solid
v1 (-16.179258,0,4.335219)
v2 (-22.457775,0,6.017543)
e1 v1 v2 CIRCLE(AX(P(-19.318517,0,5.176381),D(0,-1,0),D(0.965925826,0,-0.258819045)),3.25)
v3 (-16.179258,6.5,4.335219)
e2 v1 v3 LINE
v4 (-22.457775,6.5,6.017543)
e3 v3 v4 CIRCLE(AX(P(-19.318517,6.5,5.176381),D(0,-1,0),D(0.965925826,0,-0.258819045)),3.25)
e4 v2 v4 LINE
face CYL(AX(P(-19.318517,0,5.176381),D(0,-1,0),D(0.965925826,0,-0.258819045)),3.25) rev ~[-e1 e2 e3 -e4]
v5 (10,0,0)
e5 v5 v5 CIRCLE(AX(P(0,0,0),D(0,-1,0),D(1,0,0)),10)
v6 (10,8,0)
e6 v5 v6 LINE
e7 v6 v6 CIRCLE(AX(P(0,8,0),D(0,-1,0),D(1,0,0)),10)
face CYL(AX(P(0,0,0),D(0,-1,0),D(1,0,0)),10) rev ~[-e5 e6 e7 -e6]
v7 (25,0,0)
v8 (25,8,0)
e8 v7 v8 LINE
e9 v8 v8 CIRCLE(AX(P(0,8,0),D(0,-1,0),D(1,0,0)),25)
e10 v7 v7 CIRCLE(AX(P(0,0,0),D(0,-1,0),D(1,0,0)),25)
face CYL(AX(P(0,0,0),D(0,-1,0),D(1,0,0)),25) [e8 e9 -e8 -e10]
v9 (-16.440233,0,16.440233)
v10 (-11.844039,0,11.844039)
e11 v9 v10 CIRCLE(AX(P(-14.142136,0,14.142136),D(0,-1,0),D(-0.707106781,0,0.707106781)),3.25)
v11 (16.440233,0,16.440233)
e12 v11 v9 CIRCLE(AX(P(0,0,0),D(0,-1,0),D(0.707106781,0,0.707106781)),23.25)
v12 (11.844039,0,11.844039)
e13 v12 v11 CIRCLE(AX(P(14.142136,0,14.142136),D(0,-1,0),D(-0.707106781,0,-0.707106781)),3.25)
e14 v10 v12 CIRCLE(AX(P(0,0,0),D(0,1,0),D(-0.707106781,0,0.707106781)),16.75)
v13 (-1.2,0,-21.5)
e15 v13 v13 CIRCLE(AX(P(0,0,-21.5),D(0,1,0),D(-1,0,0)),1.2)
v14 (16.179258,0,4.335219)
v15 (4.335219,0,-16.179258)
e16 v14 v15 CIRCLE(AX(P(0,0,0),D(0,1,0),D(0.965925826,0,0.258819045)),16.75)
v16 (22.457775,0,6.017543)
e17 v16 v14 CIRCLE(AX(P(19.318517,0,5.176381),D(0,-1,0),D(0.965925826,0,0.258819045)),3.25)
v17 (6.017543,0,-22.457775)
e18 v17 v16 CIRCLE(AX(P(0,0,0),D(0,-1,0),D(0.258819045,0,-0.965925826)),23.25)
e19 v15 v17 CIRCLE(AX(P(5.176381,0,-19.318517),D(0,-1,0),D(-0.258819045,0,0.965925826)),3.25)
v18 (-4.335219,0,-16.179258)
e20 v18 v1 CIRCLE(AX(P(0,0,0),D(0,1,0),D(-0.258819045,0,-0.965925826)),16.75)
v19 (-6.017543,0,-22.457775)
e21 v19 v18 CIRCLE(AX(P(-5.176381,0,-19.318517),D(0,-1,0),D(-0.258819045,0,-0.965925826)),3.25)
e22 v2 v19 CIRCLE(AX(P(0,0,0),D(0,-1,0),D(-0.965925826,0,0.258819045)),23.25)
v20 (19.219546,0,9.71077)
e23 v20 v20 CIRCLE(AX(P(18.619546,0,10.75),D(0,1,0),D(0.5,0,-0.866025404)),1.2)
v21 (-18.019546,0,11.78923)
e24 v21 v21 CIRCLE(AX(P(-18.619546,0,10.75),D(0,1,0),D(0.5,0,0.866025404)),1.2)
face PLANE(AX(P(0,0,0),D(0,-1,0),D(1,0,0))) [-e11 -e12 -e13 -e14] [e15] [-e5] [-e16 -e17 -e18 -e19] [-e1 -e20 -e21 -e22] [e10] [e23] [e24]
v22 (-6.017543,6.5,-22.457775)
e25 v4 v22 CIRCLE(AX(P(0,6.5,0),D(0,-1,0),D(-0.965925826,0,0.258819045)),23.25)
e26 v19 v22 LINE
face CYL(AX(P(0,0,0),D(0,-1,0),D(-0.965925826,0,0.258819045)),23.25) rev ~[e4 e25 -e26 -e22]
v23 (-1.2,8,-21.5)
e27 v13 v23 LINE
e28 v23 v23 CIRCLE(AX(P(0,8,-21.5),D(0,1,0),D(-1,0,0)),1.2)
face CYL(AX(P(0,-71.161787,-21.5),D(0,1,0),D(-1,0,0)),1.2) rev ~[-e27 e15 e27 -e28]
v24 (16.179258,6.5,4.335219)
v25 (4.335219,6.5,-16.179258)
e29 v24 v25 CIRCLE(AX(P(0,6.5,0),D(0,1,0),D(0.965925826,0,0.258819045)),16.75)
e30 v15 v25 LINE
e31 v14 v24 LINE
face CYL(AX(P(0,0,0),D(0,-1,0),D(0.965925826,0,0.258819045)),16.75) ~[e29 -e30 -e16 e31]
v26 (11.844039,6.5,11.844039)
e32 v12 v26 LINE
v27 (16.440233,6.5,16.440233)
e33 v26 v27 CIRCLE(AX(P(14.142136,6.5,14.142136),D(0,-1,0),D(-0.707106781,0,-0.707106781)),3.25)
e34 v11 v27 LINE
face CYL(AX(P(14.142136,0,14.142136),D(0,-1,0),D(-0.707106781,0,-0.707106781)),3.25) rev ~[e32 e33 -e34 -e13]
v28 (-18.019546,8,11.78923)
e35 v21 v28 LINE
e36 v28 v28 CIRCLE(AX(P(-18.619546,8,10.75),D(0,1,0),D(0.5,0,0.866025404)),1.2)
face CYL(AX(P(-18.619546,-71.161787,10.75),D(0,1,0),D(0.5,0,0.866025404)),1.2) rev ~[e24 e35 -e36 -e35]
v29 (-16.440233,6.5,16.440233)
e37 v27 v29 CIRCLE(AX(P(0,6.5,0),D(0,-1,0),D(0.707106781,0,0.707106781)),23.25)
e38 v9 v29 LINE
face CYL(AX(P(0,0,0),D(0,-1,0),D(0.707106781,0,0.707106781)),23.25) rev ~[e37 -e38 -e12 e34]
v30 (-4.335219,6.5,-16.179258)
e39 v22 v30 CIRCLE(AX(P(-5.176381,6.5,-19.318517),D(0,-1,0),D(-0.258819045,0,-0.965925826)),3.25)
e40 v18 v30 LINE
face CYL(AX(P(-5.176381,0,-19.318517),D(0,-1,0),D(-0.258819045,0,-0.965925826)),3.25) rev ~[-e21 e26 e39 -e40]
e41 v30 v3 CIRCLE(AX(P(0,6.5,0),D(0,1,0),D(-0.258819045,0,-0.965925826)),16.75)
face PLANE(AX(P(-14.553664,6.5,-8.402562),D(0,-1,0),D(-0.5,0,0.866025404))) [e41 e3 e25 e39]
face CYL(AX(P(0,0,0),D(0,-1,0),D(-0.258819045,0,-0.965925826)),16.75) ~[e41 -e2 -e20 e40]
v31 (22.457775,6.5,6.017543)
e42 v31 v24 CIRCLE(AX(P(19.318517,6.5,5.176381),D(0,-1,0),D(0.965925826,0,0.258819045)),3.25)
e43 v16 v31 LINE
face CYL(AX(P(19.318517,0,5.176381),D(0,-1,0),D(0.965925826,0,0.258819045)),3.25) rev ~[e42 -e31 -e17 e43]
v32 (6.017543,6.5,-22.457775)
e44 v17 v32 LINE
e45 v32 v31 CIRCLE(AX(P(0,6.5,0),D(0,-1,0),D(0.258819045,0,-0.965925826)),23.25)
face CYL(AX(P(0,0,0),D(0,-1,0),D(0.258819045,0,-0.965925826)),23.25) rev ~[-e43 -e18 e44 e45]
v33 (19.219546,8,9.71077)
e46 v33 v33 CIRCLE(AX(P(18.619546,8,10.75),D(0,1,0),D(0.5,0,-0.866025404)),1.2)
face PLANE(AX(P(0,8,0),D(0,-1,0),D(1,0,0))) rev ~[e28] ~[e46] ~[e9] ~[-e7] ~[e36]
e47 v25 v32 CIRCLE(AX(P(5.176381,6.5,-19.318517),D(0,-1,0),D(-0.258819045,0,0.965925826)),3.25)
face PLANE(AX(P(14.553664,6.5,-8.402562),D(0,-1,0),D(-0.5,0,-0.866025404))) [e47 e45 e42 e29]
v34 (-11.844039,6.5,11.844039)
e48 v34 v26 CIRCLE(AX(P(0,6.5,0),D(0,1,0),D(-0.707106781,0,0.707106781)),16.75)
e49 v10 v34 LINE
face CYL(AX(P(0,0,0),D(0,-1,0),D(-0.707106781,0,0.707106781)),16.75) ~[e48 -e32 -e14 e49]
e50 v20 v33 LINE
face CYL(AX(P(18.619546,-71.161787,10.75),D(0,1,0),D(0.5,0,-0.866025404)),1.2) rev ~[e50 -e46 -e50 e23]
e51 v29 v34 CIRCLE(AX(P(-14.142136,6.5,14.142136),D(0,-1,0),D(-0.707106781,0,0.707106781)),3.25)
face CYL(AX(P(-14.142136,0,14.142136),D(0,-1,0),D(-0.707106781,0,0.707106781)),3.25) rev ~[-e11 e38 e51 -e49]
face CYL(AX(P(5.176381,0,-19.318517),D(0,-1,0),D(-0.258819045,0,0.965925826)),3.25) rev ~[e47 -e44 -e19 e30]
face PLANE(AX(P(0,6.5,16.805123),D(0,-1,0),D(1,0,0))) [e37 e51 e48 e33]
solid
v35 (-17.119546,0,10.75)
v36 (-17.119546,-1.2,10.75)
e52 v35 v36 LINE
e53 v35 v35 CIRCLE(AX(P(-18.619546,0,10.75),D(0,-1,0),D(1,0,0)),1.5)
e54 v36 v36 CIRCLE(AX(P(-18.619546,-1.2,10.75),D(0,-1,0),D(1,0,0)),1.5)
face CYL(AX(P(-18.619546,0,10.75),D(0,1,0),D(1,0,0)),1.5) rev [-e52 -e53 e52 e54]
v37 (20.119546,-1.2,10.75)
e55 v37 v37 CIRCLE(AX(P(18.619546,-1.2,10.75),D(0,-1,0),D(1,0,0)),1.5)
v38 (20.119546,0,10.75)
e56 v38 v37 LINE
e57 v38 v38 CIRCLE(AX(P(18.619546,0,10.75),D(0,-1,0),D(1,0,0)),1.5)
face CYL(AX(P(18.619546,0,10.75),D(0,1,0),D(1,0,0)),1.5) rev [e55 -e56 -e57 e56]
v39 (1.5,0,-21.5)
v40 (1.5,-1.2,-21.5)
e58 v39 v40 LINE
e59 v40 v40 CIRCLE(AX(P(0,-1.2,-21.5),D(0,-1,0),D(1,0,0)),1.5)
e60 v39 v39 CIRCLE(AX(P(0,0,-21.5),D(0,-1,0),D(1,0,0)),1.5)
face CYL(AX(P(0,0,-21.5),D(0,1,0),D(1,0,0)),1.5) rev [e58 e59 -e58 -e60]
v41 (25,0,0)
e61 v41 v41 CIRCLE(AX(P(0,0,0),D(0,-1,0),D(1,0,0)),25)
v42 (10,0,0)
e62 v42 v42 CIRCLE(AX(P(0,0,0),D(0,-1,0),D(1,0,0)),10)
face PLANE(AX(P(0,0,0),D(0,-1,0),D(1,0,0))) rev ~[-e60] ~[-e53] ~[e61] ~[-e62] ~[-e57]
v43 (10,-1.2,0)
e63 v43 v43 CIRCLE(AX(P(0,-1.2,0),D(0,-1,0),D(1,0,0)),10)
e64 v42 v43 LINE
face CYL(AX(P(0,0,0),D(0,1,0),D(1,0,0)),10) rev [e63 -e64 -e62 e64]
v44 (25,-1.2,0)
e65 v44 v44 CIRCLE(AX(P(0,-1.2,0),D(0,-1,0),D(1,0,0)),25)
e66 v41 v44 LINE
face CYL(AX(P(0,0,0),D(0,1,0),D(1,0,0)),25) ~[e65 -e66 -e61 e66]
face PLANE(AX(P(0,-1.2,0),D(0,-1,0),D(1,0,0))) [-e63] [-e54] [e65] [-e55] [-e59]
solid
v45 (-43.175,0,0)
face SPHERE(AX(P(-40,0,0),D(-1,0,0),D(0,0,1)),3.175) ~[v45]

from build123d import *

# Parameters (mm, degrees)
F0_R            = 25
F0_R_2          = 10
F1_DEPTH        = 8
F3_DEPTH        = 6.5
F3_COPIES_COUNT = 3
F5_D            = 2.4
F5_COPIES_COUNT = 3
F6_R            = 25
F6_R_2          = 1.5
F6_R_3          = 10
F7_DEPTH        = 1.2


# Not quite as in the source:
# - a pattern or mirror of a feature is missing from the dataset's text; its kind, count and spacing are read off the source's solid


with BuildPart() as f1:
    # F0 (on Front) → F1 (new body)
    with BuildSketch(Plane.XZ):
        Circle(F0_R)
        Circle(F0_R_2, mode=Mode.SUBTRACT)
    extrude(amount=-F1_DEPTH)

    # F2 (on face) → F3 (cut)
    with BuildSketch(Plane.XZ):
        with BuildLine():
            ThreePointArc((-16.4402326626, 16.4402326626), (-16.4402326626, 11.8440385849), (-11.8440385849, 11.8440385849))
            ThreePointArc((-11.8440385849, 11.8440385849), (0, 16.75), (11.8440385849, 11.8440385849))
            ThreePointArc((11.8440385849, 11.8440385849), (16.4402326626, 11.8440385849), (16.4402326626, 16.4402326626))
            ThreePointArc((16.4402326626, 16.4402326626), (0, 23.25), (-16.4402326626, 16.4402326626))
        make_face()
    f3 = extrude(amount=-F3_DEPTH, mode=Mode.SUBTRACT)

    # F3_copies: F3 ×3 about axis
    f3_copies_axis = Axis((0, 0, 0), (0, 1, 0))
    for i in range(1, F3_COPIES_COUNT):
        add(f3.rotate(f3_copies_axis, i * 360 / F3_COPIES_COUNT), mode=Mode.SUBTRACT)

    # F5 (through all)
    with Locations(Plane.XZ):
        with Locations((0, -21.5)):
            f5 = Hole(F5_D / 2)

    # F5_copies: F5 ×3 about axis
    f5_copies_axis = Axis((0, 0, 0), (0, 1, 0))
    for i in range(1, F5_COPIES_COUNT):
        add(f5.rotate(f5_copies_axis, i * 360 / F5_COPIES_COUNT), mode=Mode.SUBTRACT)


with BuildPart() as f7:
    # F6 (on face) → F7 (new body)
    with BuildSketch(Plane.XZ):
        Circle(F6_R)
        with Locations((0, -21.5)):
            Circle(F6_R_2, mode=Mode.SUBTRACT)
        with Locations((-18.6195461814, 10.75)):
            Circle(F6_R_2, mode=Mode.SUBTRACT)
        Circle(F6_R_3, mode=Mode.SUBTRACT)
        with Locations((18.6195461814, 10.75)):
            Circle(F6_R_2, mode=Mode.SUBTRACT)
    extrude(amount=F7_DEPTH)


with BuildPart() as f9:
    # F8 (on Front) → F9 (revolve)
    with BuildSketch(Plane.XZ):
        with BuildLine():
            Line((-43.175, 0), (-36.825, 0))
            ThreePointArc((-36.825, 0), (-40, 3.175), (-43.175, 0))
        make_face()
    revolve(axis=Axis((-40, 0, 0), (1, 0, 0)))


solid = Compound([f1.part, f7.part, f9.part])
